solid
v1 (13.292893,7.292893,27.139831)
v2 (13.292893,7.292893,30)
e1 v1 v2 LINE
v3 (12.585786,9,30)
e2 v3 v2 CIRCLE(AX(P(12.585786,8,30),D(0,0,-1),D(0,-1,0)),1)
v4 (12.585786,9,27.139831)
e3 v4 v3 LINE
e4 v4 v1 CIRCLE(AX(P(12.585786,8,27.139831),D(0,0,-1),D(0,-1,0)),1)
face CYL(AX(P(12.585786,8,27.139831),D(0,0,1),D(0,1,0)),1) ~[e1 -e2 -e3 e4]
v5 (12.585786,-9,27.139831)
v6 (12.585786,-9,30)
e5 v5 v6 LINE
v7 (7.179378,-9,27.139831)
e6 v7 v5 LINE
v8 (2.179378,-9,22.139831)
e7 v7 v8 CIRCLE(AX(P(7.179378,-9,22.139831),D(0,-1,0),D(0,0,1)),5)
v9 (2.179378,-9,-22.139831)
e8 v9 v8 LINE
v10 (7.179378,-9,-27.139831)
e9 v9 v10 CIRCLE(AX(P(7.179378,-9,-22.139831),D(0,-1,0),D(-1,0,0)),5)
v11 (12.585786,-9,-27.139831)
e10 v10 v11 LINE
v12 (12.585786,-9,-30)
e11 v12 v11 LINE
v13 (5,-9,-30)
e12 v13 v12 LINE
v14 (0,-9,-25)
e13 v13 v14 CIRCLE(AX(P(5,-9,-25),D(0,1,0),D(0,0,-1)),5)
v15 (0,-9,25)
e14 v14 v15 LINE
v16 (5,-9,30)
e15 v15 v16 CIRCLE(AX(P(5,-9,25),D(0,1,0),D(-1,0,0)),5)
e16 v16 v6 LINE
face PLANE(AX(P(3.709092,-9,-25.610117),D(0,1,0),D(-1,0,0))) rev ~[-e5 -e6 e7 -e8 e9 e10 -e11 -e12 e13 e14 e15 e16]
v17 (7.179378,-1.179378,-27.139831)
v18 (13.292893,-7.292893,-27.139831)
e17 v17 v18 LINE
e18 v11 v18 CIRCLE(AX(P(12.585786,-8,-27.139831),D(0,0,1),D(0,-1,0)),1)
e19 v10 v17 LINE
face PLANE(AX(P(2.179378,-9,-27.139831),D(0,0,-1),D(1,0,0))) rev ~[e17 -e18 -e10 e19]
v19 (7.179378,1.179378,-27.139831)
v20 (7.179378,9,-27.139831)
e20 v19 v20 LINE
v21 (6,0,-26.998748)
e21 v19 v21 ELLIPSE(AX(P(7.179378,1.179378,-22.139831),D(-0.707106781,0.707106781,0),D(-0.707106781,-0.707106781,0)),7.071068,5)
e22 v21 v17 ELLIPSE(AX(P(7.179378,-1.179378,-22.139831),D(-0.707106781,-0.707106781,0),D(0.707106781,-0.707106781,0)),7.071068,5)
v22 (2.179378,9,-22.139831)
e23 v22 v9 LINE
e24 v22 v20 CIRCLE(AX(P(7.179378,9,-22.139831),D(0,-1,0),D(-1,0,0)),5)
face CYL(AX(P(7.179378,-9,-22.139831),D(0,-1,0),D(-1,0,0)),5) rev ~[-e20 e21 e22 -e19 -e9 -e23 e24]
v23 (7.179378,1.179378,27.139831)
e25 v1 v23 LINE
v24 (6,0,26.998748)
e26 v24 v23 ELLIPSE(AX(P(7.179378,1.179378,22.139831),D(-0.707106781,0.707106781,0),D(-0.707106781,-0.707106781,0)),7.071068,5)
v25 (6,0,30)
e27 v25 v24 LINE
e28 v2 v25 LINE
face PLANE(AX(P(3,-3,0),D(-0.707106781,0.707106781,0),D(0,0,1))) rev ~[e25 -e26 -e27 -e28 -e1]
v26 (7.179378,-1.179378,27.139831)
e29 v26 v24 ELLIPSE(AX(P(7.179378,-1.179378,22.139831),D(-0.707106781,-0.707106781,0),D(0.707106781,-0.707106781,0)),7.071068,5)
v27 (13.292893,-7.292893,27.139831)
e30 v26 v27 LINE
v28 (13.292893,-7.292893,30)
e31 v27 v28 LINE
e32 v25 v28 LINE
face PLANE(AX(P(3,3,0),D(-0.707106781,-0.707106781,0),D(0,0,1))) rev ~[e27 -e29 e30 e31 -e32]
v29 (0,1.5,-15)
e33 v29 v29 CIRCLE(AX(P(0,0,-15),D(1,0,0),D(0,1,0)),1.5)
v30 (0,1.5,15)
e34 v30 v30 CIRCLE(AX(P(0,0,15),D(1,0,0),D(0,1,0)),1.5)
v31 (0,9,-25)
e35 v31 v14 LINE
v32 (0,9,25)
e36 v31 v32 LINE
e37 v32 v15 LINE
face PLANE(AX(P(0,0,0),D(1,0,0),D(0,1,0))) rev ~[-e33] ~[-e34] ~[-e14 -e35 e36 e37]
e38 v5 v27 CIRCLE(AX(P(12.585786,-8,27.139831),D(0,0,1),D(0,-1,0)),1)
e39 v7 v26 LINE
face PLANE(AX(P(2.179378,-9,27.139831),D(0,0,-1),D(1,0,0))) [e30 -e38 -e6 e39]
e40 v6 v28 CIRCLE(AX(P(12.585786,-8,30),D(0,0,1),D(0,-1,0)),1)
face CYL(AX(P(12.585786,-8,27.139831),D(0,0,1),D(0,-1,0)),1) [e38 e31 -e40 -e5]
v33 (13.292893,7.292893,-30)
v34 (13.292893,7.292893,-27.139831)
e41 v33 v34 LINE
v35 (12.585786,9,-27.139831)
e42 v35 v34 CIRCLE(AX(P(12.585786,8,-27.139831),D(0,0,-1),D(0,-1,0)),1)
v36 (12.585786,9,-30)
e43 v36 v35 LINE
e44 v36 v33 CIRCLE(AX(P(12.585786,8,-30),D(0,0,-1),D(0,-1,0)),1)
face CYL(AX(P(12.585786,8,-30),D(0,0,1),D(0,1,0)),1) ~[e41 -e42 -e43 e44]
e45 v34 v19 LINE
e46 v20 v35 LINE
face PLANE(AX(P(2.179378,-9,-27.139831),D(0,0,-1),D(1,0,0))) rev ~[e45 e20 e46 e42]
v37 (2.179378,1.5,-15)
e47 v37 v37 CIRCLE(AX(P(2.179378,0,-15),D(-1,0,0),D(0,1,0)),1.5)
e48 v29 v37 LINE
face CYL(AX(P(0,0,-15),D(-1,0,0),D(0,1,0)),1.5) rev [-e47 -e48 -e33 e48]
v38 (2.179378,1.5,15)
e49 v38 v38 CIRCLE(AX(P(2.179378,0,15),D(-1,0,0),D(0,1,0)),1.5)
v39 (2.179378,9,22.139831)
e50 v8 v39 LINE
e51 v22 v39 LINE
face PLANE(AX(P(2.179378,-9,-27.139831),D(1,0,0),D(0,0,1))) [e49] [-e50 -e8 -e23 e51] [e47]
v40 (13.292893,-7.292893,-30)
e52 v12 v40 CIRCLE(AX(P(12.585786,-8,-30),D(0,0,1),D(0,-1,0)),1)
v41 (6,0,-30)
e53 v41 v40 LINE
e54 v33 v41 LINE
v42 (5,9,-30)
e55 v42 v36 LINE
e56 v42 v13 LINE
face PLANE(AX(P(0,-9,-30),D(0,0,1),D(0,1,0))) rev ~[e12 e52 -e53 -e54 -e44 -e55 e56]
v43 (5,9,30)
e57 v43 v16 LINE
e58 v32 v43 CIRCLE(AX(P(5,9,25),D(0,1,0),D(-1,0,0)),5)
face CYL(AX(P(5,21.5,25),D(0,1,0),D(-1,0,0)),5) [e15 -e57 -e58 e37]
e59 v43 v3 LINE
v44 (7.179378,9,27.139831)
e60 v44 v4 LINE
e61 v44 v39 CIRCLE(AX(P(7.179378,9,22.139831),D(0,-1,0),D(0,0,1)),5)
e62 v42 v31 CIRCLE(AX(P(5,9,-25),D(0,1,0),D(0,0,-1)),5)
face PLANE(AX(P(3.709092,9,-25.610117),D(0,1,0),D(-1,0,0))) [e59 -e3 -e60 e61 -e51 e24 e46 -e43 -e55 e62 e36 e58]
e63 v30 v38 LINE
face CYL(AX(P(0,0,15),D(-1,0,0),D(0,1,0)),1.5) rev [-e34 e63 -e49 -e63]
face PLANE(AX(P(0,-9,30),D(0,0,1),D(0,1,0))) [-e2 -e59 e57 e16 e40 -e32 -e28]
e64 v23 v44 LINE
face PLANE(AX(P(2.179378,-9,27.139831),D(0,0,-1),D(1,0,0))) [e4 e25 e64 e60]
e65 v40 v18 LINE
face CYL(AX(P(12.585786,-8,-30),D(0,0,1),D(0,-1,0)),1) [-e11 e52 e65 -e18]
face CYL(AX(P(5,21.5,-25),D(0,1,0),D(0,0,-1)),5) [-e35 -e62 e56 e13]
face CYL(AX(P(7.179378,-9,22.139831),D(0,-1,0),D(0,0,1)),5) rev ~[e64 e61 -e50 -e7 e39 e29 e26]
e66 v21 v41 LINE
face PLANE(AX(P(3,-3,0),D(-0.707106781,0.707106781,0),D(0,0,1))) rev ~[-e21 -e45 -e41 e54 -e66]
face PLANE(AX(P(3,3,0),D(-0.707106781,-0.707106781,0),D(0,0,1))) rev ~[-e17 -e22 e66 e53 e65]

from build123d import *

# Parameters (mm, degrees)
F0_W         = 18
F0_H         = 60
F0_R         = 1.5
F1_DEPTH     = 15
F3_DEPTH     = 80
F4_W         = 12.820621879
F4_H         = 54.2796626687
F5_DEPTH     = 25
F6_R         = 1
F7_T4_DEPTH  = 18
F7_T10_DEPTH = 18
F7_T16_DEPTH = 18
F7_T22_DEPTH = 18
F7_T28_DEPTH = 18
F7_T34_DEPTH = 18
F7_T37_DEPTH = 43


# Not quite as in the source:
# - a fillet or chamfer that OpenCascade refuses, or shapes differently, is made with other operations: its cross-section is extruded or revolved along the edge and cut away or added


with BuildPart() as f1:
    # F0 (on Right) → F1 (new body)
    with BuildSketch(Plane.YZ):
        Rectangle(F0_W, F0_H)
        with Locations((0, -15)):
            Circle(F0_R, mode=Mode.SUBTRACT)
        with Locations((0, 15)):
            Circle(F0_R, mode=Mode.SUBTRACT)
    extrude(amount=F1_DEPTH)

    # F2 (on face) → F3 (cut)
    with BuildSketch(Plane.XY.offset(30)):
        Polygon((15, -9), (15, 9), (6, 0), align=None)
    extrude(amount=-F3_DEPTH, mode=Mode.SUBTRACT)

    # F4 (on face) → F5 (cut)
    with BuildSketch(Plane.XZ.offset(9)):
        with Locations((8.5896890605, 0)):
            Rectangle(F4_W, F4_H)
    extrude(amount=-F5_DEPTH, mode=Mode.SUBTRACT)

    # F6
    f6_edges = [f1.edges().sort_by_distance(p)[0] for p in [
        (15, -9, 28.569916),
        (15, 9, 28.569916),
        (15, -9, -28.569916),
        (15, 9, -28.569916),
    ]]
    fillet(f6_edges, radius=F6_R)

    # F7: fillet of radius 5 on 4 edges, made by hand


with BuildPart() as f7_tool2:
    # F7_s3 → F7_t4 (new body)
    with BuildSketch(Plane.XZ.offset(9)):
        with BuildLine():
            ThreePointArc((7.179378121, 27.1398313344), (3.6438442151, 25.6753652403), (2.179378121, 22.1398313344))
            Line((2.179378121, 22.1398313344), (2.179378121, 27.1398313344))
            Line((2.179378121, 27.1398313344), (7.179378121, 27.1398313344))
        make_face()
    extrude(amount=-F7_T4_DEPTH)

    split(bisect_by=Plane(origin=(3, 3, 0), x_dir=(0, 0, 1), z_dir=(-0.7071067812, -0.7071067812, 0)), keep=Keep.TOP)

    split(bisect_by=Plane(origin=(3, -3, 0), x_dir=(0, 0, 1), z_dir=(0.7071067812, -0.7071067812, 0)), keep=Keep.TOP)


with BuildPart() as f1_1:
    add(f1.part)

    # F7_t1: union F7_tool2
    add(f7_tool2.part)


with BuildPart() as f7_tool8:
    # F7_s9 → F7_t10 (new body)
    with BuildSketch(Plane.XZ.offset(9)):
        with BuildLine():
            ThreePointArc((7.179378121, 27.1398313344), (3.6438442151, 25.6753652403), (2.179378121, 22.1398313344))
            Line((2.179378121, 22.1398313344), (2.179378121, 27.1398313344))
            Line((2.179378121, 27.1398313344), (7.179378121, 27.1398313344))
        make_face()
    extrude(amount=-F7_T10_DEPTH)

    split(bisect_by=Plane(origin=(3, 3, 0), x_dir=(0, 0, 1), z_dir=(-0.7071067812, -0.7071067812, 0)), keep=Keep.TOP)

    split(bisect_by=Plane(origin=(3, -3, 0), x_dir=(0, 0, 1), z_dir=(-0.7071067812, 0.7071067812, 0)), keep=Keep.TOP)


with BuildPart() as f1_2:
    add(f1_1.part)

    # F7_t7: union F7_tool8
    add(f7_tool8.part)


with BuildPart() as f7_tool14:
    # F7_s15 → F7_t16 (new body)
    with BuildSketch(Plane.XZ.offset(9)):
        with BuildLine():
            ThreePointArc((7.179378121, 27.1398313344), (3.6438442151, 25.6753652403), (2.179378121, 22.1398313344))
            Line((2.179378121, 22.1398313344), (2.179378121, 27.1398313344))
            Line((2.179378121, 27.1398313344), (7.179378121, 27.1398313344))
        make_face()
    extrude(amount=-F7_T16_DEPTH)

    split(bisect_by=Plane(origin=(3, 3, 0), x_dir=(0, 0, 1), z_dir=(0.7071067812, 0.7071067812, 0)), keep=Keep.TOP)

    split(bisect_by=Plane(origin=(3, -3, 0), x_dir=(0, 0, 1), z_dir=(-0.7071067812, 0.7071067812, 0)), keep=Keep.TOP)


with BuildPart() as f1_3:
    add(f1_2.part)

    # F7_t13: union F7_tool14
    add(f7_tool14.part)


with BuildPart() as f7_tool20:
    # F7_s21 → F7_t22 (new body)
    with BuildSketch(Plane.XZ.offset(9)):
        with BuildLine():
            ThreePointArc((2.179378121, -22.1398313344), (3.6438442151, -25.6753652403), (7.179378121, -27.1398313344))
            Line((7.179378121, -27.1398313344), (2.179378121, -27.1398313344))
            Line((2.179378121, -27.1398313344), (2.179378121, -22.1398313344))
        make_face()
    extrude(amount=-F7_T22_DEPTH)

    split(bisect_by=Plane(origin=(3, 3, 0), x_dir=(0, 0, 1), z_dir=(-0.7071067812, -0.7071067812, 0)), keep=Keep.TOP)

    split(bisect_by=Plane(origin=(3, -3, 0), x_dir=(0, 0, 1), z_dir=(0.7071067812, -0.7071067812, 0)), keep=Keep.TOP)


with BuildPart() as f1_4:
    add(f1_3.part)

    # F7_t19: union F7_tool20
    add(f7_tool20.part)


with BuildPart() as f7_tool26:
    # F7_s27 → F7_t28 (new body)
    with BuildSketch(Plane.XZ.offset(9)):
        with BuildLine():
            ThreePointArc((2.179378121, -22.1398313344), (3.6438442151, -25.6753652403), (7.179378121, -27.1398313344))
            Line((7.179378121, -27.1398313344), (2.179378121, -27.1398313344))
            Line((2.179378121, -27.1398313344), (2.179378121, -22.1398313344))
        make_face()
    extrude(amount=-F7_T28_DEPTH)

    split(bisect_by=Plane(origin=(3, 3, 0), x_dir=(0, 0, 1), z_dir=(-0.7071067812, -0.7071067812, 0)), keep=Keep.TOP)

    split(bisect_by=Plane(origin=(3, -3, 0), x_dir=(0, 0, 1), z_dir=(-0.7071067812, 0.7071067812, 0)), keep=Keep.TOP)


with BuildPart() as f1_5:
    add(f1_4.part)

    # F7_t25: union F7_tool26
    add(f7_tool26.part)


with BuildPart() as f7_tool32:
    # F7_s33 → F7_t34 (new body)
    with BuildSketch(Plane.XZ.offset(9)):
        with BuildLine():
            ThreePointArc((2.179378121, -22.1398313344), (3.6438442151, -25.6753652403), (7.179378121, -27.1398313344))
            Line((7.179378121, -27.1398313344), (2.179378121, -27.1398313344))
            Line((2.179378121, -27.1398313344), (2.179378121, -22.1398313344))
        make_face()
    extrude(amount=-F7_T34_DEPTH)

    split(bisect_by=Plane(origin=(3, 3, 0), x_dir=(0, 0, 1), z_dir=(0.7071067812, 0.7071067812, 0)), keep=Keep.TOP)

    split(bisect_by=Plane(origin=(3, -3, 0), x_dir=(0, 0, 1), z_dir=(-0.7071067812, 0.7071067812, 0)), keep=Keep.TOP)


with BuildPart() as f1_6:
    add(f1_5.part)

    # F7_t31: union F7_tool32
    add(f7_tool32.part)

    # F7_s38 → F7_t37 (cut)
    with BuildSketch(Plane.XZ.offset(-21.5)):
        with BuildLine():
            ThreePointArc((0, 25), (1.4644660941, 28.5355339059), (5, 30))
            Line((5, 30), (0, 30))
            Line((0, 30), (0, 25))
        make_face()
        with BuildLine():
            ThreePointArc((5, -30), (1.4644660941, -28.5355339059), (0, -25))
            Line((0, -25), (0, -30))
            Line((0, -30), (5, -30))
        make_face()
    extrude(amount=F7_T37_DEPTH, mode=Mode.SUBTRACT)


solid = f1_6.part
